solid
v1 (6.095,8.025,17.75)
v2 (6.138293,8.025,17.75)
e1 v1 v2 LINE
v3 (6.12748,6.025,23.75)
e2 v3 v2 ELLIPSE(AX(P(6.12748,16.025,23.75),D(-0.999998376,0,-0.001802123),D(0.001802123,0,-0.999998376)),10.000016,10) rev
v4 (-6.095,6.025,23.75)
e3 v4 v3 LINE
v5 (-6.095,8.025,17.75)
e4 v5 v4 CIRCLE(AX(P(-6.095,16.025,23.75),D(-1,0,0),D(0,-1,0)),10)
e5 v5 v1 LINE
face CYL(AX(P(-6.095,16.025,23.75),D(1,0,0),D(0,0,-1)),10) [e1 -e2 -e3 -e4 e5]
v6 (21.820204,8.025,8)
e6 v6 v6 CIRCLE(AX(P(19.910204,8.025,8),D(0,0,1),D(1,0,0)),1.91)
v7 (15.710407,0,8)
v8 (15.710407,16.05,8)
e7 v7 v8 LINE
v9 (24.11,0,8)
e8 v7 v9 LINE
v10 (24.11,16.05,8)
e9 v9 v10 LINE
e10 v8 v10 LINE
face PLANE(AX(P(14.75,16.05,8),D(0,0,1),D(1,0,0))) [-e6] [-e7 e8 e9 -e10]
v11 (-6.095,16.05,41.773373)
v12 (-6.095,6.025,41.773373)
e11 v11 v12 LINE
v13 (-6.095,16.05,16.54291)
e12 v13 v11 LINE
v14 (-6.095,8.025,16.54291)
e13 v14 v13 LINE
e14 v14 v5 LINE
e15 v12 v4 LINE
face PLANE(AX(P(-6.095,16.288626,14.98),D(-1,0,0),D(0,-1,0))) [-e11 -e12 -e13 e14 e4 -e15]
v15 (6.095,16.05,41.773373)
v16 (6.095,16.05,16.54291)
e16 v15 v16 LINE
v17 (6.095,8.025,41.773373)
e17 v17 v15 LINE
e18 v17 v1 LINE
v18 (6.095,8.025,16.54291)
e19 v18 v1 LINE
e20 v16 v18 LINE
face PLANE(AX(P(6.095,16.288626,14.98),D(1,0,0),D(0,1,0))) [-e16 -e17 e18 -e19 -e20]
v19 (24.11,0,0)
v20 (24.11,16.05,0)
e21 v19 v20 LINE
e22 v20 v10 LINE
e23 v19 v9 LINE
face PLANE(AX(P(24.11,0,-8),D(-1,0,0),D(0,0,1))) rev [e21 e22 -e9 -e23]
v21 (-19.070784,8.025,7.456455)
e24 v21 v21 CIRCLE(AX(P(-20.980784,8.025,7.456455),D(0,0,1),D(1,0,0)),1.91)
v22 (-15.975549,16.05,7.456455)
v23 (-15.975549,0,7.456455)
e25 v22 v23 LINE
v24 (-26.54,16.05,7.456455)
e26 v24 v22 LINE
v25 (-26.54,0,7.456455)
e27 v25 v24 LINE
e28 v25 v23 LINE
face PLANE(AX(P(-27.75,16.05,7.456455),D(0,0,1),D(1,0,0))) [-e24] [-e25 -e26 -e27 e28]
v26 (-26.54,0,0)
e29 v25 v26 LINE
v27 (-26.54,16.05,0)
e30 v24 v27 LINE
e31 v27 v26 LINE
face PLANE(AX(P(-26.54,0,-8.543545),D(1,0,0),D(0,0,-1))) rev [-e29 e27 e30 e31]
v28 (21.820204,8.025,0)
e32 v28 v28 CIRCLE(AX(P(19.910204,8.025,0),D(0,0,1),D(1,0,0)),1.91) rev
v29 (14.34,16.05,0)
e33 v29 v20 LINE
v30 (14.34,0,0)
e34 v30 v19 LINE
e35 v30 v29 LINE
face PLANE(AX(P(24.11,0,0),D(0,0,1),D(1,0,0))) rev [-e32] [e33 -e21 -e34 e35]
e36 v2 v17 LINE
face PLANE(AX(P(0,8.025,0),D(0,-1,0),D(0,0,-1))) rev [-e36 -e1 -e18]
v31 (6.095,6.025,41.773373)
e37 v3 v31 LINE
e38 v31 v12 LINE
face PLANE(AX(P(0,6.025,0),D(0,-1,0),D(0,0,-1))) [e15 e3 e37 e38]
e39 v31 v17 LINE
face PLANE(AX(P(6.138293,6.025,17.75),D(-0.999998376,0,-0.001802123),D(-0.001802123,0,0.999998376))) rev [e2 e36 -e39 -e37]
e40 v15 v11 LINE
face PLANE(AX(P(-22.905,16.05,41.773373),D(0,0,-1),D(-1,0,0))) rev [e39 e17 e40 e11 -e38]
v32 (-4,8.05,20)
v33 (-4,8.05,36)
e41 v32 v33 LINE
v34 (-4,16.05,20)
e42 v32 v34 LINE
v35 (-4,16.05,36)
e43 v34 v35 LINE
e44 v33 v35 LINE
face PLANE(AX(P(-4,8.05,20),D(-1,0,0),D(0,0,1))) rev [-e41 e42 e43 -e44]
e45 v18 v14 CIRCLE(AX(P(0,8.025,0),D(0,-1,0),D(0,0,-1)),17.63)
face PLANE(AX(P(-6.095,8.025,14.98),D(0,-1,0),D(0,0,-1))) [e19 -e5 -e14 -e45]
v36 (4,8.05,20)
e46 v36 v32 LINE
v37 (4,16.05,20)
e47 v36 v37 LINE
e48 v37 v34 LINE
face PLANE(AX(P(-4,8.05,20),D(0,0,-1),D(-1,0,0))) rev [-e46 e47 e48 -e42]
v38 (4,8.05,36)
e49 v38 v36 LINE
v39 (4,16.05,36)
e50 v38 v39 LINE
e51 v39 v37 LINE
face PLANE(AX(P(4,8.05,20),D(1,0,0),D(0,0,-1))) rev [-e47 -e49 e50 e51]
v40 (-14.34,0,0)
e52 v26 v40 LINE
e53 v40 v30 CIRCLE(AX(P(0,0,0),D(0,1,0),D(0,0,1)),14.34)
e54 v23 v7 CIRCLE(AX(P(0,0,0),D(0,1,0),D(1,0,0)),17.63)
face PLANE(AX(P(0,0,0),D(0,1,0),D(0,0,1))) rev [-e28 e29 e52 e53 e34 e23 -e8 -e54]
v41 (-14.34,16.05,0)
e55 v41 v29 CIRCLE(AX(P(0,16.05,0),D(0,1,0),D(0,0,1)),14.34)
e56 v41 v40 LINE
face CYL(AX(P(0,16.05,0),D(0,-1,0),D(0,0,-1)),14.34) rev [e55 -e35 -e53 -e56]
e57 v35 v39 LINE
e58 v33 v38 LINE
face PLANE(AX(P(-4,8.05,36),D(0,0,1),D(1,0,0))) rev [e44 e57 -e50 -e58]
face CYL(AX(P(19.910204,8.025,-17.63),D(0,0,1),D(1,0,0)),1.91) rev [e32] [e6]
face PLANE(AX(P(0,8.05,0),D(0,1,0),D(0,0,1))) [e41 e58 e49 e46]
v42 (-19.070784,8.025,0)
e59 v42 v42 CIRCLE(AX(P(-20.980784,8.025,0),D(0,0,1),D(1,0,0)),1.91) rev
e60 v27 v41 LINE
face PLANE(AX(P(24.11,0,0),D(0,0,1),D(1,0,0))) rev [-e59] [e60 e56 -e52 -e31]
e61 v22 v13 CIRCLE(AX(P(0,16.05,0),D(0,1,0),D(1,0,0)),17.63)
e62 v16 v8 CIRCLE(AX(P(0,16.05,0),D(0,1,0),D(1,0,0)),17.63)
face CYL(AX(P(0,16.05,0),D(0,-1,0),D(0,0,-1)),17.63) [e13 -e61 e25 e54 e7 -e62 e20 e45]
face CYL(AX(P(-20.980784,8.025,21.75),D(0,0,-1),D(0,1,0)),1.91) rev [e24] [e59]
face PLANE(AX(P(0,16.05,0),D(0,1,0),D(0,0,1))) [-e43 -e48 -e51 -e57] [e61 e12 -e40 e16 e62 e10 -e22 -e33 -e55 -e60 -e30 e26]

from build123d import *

# Parameters (mm, degrees)
SKETCH_1_R             = 17.63
SKETCH_1_R_2           = 14.34
EXTRUDE_1_DEPTH        = 16.05
EXTRUDE_1_2_DEPTH      = 9.77
EXTRUDE_1_2_DEPTH_BACK = 3
SKETCH_2_W             = 16
SKETCH_2_H             = 16.05
SKETCH_3_W             = 3.41
SKETCH_3_H             = 16
CUT_EXTRUDE_1_DEPTH    = 37.411121927
SKETCH_4_R             = 1.91
CUT_EXTRUDE_2_DEPTH    = 39.675463798
EXTRUDE_2_DEPTH        = 4
EXTRUDE_2_DEPTH_BACK   = 2.77
SKETCH_5_W             = 12.19
SKETCH_5_H             = 8.263625949
SKETCH_6_W             = 12.19
SKETCH_6_H             = 6.77
EXTRUDE_3_DEPTH        = 63
SKETCH_8_W             = 12.19
SKETCH_8_H             = 6.77
EXTRUDE_4_DEPTH        = 0.16
EXTRUDE_5_DEPTH        = 3.16
EXTRUDE_5_DEPTH_BACK   = 10
SKETCH_12_W            = 16
SKETCH_12_H            = 16.05
SKETCH_13_W            = 1.21
SKETCH_13_H            = 16
CUT_EXTRUDE_3_DEPTH    = 73.543164889
SKETCH_14_R            = 1.91
CUT_EXTRUDE_4_DEPTH    = 90.07387176
SKETCH_15_R            = 4.05
CUT_EXTRUDE_5_DEPTH    = 24
SKETCH_16_W            = 56.400519221
SKETCH_16_H            = 19.935010357
CUT_EXTRUDE_6_DEPTH    = 73.088971918
SKETCH_17_W            = 12.19
SKETCH_17_H            = 71.423625949
EXTRUDE_7_DEPTH        = 25
SKETCH_18_W            = 26.793372528
SKETCH_18_H            = 63.398625949
CUT_EXTRUDE_7_DEPTH    = 25
SKETCH_19_R            = 4
CUT_EXTRUDE_8_DEPTH    = 24
CUT_EXTRUDE_9_DEPTH    = 29
SKETCH_21_W            = 8
SKETCH_21_H            = 16
CUT_EXTRUDE_10_DEPTH   = 8
EXTRUDE_9_DEPTH        = 2
FILLET_1_R             = 10


with BuildPart() as part:
    # 草圖1 → Extrude 1 (new body)
    with BuildSketch(Plane(origin=(0, 0, 0), x_dir=(1, 0, 0), z_dir=(0, 1, 0))):
        Circle(SKETCH_1_R)
        Circle(SKETCH_1_R_2, mode=Mode.SUBTRACT)
    extrude(amount=EXTRUDE_1_DEPTH)

    # 草圖2 → Extrude 1 2 (add, two sides: drawn at the far end of the back side and taken through both)
    with BuildSketch(Plane(origin=(17.75, 0, 0), x_dir=(0, 0, -1), z_dir=(1, 0, 0)).offset(-EXTRUDE_1_2_DEPTH_BACK)):
        with Locations((0, 8.025)):
            Rectangle(SKETCH_2_W, SKETCH_2_H)
    extrude(amount=EXTRUDE_1_2_DEPTH + EXTRUDE_1_2_DEPTH_BACK)

    # 草圖3 → 除料-伸長1 (cut, through all)
    with BuildSketch(Plane(origin=(0, 16.05, 0), x_dir=(1, 0, 0), z_dir=(0, 1, 0))):
        with Locations((25.815, 0)):
            Rectangle(SKETCH_3_W, SKETCH_3_H)
    extrude(amount=-CUT_EXTRUDE_1_DEPTH, mode=Mode.SUBTRACT)

    # 草圖4 → 除料-伸長2 (cut, through all)
    with BuildSketch(Plane.XY.offset(8)):
        with Locations((19.910203689, 8.025)):
            Circle(SKETCH_4_R)
    extrude(amount=-CUT_EXTRUDE_2_DEPTH, mode=Mode.SUBTRACT)

    # 草圖5 → 填料-伸長2 (add, two sides: drawn at the far end of the back side and taken through both)
    with BuildSketch(Plane.XY.offset(17.75).offset(-EXTRUDE_2_DEPTH_BACK)):
        with Locations((0, 12.156812974)):
            Rectangle(SKETCH_5_W, SKETCH_5_H)
    extrude(amount=EXTRUDE_2_DEPTH + EXTRUDE_2_DEPTH_BACK)

    # 草圖6 → 填料-伸長3 (add)
    with BuildSketch(Plane(origin=(0, 16.288625949, 0), x_dir=(1, 0, 0), z_dir=(0, 1, 0))):
        with Locations((0, -18.365)):
            Rectangle(SKETCH_6_W, SKETCH_6_H)
    extrude(amount=EXTRUDE_3_DEPTH)

    # 草圖8 → 填料-伸長4 (add)
    with BuildSketch(Plane(origin=(0, 79.288625949, 0), x_dir=(1, 0, 0), z_dir=(0, 1, 0))):
        with Locations((0, -18.365)):
            Rectangle(SKETCH_8_W, SKETCH_8_H)
    extrude(amount=EXTRUDE_4_DEPTH)

    # 草圖12 → 填料-伸長5 (add, two sides: drawn at the far end of the back side and taken through both)
    with BuildSketch(Plane(origin=(-17.75, 0, 0), x_dir=(0, 0, -1), z_dir=(1, 0, 0)).offset(-EXTRUDE_5_DEPTH_BACK)):
        with Locations((0.543544944, 8.025)):
            Rectangle(SKETCH_12_W, SKETCH_12_H)
    extrude(amount=EXTRUDE_5_DEPTH + EXTRUDE_5_DEPTH_BACK)

    # 草圖13 → 除料-伸長3 (cut, through all)
    with BuildSketch(Plane(origin=(0, 16.05, 0), x_dir=(1, 0, 0), z_dir=(0, 1, 0))):
        with Locations((-27.145, 0.543544944)):
            Rectangle(SKETCH_13_W, SKETCH_13_H)
    extrude(amount=-CUT_EXTRUDE_3_DEPTH, mode=Mode.SUBTRACT)

    # 草圖14 → 除料-伸長4 (cut, through all)
    with BuildSketch(Plane(origin=(0, 0, -8.543544944), x_dir=(-1, 0, 0), z_dir=(0, 0, -1))):
        with Locations(Location((20.980783679, 8.025, 0), (0, 0, 90))):
            Circle(SKETCH_14_R)
    extrude(amount=-CUT_EXTRUDE_4_DEPTH, mode=Mode.SUBTRACT)

    # 草圖15 → 除料-伸長5 (cut)
    with BuildSketch(Plane(origin=(0, 79.448625949, 0), x_dir=(1, 0, 0), z_dir=(0, 1, 0))):
        with Locations((0, -14.98)):
            Circle(SKETCH_15_R)
    extrude(amount=-CUT_EXTRUDE_5_DEPTH, mode=Mode.SUBTRACT)

    # 草圖16 → 除料-伸長6 (cut, through all)
    with BuildSketch(Plane(origin=(0, 16.05, 0), x_dir=(1, 0, 0), z_dir=(0, 1, 0))):
        with Locations((-4.090259611, 9.967505179)):
            Rectangle(SKETCH_16_W, SKETCH_16_H)
    extrude(amount=-CUT_EXTRUDE_6_DEPTH, mode=Mode.SUBTRACT)

    # 草圖17 → 填料-伸長7 (add)
    with BuildSketch(Plane.XY.offset(21.75)):
        with Locations((0, 43.736812975)):
            Rectangle(SKETCH_17_W, SKETCH_17_H)
    extrude(amount=EXTRUDE_7_DEPTH)

    # 草圖18 → 除料-伸長7 (cut)
    with BuildSketch(Plane.ZY.offset(6.095)):
        with Locations((28.376686264, 47.749312975)):
            Rectangle(SKETCH_18_W, SKETCH_18_H)
    extrude(amount=-CUT_EXTRUDE_7_DEPTH, mode=Mode.SUBTRACT)

    # 草圖19 → 除料-伸長8 (cut)
    with BuildSketch(Plane(origin=(0, 79.448625949, 0), x_dir=(1, 0, 0), z_dir=(0, 1, 0))):
        with Locations((0, -41.773372528)):
            Circle(SKETCH_19_R)
    extrude(amount=-CUT_EXTRUDE_8_DEPTH, mode=Mode.SUBTRACT)

    # 草圖20 → 除料-伸長9 (cut)
    with BuildSketch(Plane(origin=(6.095, 0, 0), x_dir=(0, 0, -1), z_dir=(1, 0, 0))):
        Polygon((-41.773372528, 16.05), (-41.773372528, 8.025), (-46.75, 8.025), (-46.75, 79.448625949), (-41.773372528, 79.448625949), align=None)
    extrude(amount=-CUT_EXTRUDE_9_DEPTH, mode=Mode.SUBTRACT)

    # 草圖21 → 除料-伸長10 (cut)
    with BuildSketch(Plane(origin=(0, 16.05, 0), x_dir=(1, 0, 0), z_dir=(0, 1, 0))):
        with Locations((0, -28)):
            Rectangle(SKETCH_21_W, SKETCH_21_H)
    extrude(amount=-CUT_EXTRUDE_10_DEPTH, mode=Mode.SUBTRACT)

    # 草圖23 → 填料-伸長9 (add)
    with BuildSketch(Plane.XZ.offset(-8.025)):
        Polygon((-6.095, 41.773372528), (-6.095, 17.75), (6.13829314, 17.75), (6.095, 41.773372528), align=None)
    extrude(amount=EXTRUDE_9_DEPTH)

    # 圓角1
    # the kernel refuses this fillet: 10 mm, written as the material it takes off along each edge
    with BuildSketch(Plane(origin=(-21.095, 6.025, 17.75), x_dir=(0, 0, 1), z_dir=(1, 0, 0))) as fillet_1_piece_1:
        with BuildLine():
            CenterArc((6, -10), FILLET_1_R, 90, 36.869897646)
            Line((0, -2), (0, 0))
            Line((0, 0), (6, 0))
        make_face()
    extrude(amount=42.23329314, mode=Mode.SUBTRACT)


solid = part.part
